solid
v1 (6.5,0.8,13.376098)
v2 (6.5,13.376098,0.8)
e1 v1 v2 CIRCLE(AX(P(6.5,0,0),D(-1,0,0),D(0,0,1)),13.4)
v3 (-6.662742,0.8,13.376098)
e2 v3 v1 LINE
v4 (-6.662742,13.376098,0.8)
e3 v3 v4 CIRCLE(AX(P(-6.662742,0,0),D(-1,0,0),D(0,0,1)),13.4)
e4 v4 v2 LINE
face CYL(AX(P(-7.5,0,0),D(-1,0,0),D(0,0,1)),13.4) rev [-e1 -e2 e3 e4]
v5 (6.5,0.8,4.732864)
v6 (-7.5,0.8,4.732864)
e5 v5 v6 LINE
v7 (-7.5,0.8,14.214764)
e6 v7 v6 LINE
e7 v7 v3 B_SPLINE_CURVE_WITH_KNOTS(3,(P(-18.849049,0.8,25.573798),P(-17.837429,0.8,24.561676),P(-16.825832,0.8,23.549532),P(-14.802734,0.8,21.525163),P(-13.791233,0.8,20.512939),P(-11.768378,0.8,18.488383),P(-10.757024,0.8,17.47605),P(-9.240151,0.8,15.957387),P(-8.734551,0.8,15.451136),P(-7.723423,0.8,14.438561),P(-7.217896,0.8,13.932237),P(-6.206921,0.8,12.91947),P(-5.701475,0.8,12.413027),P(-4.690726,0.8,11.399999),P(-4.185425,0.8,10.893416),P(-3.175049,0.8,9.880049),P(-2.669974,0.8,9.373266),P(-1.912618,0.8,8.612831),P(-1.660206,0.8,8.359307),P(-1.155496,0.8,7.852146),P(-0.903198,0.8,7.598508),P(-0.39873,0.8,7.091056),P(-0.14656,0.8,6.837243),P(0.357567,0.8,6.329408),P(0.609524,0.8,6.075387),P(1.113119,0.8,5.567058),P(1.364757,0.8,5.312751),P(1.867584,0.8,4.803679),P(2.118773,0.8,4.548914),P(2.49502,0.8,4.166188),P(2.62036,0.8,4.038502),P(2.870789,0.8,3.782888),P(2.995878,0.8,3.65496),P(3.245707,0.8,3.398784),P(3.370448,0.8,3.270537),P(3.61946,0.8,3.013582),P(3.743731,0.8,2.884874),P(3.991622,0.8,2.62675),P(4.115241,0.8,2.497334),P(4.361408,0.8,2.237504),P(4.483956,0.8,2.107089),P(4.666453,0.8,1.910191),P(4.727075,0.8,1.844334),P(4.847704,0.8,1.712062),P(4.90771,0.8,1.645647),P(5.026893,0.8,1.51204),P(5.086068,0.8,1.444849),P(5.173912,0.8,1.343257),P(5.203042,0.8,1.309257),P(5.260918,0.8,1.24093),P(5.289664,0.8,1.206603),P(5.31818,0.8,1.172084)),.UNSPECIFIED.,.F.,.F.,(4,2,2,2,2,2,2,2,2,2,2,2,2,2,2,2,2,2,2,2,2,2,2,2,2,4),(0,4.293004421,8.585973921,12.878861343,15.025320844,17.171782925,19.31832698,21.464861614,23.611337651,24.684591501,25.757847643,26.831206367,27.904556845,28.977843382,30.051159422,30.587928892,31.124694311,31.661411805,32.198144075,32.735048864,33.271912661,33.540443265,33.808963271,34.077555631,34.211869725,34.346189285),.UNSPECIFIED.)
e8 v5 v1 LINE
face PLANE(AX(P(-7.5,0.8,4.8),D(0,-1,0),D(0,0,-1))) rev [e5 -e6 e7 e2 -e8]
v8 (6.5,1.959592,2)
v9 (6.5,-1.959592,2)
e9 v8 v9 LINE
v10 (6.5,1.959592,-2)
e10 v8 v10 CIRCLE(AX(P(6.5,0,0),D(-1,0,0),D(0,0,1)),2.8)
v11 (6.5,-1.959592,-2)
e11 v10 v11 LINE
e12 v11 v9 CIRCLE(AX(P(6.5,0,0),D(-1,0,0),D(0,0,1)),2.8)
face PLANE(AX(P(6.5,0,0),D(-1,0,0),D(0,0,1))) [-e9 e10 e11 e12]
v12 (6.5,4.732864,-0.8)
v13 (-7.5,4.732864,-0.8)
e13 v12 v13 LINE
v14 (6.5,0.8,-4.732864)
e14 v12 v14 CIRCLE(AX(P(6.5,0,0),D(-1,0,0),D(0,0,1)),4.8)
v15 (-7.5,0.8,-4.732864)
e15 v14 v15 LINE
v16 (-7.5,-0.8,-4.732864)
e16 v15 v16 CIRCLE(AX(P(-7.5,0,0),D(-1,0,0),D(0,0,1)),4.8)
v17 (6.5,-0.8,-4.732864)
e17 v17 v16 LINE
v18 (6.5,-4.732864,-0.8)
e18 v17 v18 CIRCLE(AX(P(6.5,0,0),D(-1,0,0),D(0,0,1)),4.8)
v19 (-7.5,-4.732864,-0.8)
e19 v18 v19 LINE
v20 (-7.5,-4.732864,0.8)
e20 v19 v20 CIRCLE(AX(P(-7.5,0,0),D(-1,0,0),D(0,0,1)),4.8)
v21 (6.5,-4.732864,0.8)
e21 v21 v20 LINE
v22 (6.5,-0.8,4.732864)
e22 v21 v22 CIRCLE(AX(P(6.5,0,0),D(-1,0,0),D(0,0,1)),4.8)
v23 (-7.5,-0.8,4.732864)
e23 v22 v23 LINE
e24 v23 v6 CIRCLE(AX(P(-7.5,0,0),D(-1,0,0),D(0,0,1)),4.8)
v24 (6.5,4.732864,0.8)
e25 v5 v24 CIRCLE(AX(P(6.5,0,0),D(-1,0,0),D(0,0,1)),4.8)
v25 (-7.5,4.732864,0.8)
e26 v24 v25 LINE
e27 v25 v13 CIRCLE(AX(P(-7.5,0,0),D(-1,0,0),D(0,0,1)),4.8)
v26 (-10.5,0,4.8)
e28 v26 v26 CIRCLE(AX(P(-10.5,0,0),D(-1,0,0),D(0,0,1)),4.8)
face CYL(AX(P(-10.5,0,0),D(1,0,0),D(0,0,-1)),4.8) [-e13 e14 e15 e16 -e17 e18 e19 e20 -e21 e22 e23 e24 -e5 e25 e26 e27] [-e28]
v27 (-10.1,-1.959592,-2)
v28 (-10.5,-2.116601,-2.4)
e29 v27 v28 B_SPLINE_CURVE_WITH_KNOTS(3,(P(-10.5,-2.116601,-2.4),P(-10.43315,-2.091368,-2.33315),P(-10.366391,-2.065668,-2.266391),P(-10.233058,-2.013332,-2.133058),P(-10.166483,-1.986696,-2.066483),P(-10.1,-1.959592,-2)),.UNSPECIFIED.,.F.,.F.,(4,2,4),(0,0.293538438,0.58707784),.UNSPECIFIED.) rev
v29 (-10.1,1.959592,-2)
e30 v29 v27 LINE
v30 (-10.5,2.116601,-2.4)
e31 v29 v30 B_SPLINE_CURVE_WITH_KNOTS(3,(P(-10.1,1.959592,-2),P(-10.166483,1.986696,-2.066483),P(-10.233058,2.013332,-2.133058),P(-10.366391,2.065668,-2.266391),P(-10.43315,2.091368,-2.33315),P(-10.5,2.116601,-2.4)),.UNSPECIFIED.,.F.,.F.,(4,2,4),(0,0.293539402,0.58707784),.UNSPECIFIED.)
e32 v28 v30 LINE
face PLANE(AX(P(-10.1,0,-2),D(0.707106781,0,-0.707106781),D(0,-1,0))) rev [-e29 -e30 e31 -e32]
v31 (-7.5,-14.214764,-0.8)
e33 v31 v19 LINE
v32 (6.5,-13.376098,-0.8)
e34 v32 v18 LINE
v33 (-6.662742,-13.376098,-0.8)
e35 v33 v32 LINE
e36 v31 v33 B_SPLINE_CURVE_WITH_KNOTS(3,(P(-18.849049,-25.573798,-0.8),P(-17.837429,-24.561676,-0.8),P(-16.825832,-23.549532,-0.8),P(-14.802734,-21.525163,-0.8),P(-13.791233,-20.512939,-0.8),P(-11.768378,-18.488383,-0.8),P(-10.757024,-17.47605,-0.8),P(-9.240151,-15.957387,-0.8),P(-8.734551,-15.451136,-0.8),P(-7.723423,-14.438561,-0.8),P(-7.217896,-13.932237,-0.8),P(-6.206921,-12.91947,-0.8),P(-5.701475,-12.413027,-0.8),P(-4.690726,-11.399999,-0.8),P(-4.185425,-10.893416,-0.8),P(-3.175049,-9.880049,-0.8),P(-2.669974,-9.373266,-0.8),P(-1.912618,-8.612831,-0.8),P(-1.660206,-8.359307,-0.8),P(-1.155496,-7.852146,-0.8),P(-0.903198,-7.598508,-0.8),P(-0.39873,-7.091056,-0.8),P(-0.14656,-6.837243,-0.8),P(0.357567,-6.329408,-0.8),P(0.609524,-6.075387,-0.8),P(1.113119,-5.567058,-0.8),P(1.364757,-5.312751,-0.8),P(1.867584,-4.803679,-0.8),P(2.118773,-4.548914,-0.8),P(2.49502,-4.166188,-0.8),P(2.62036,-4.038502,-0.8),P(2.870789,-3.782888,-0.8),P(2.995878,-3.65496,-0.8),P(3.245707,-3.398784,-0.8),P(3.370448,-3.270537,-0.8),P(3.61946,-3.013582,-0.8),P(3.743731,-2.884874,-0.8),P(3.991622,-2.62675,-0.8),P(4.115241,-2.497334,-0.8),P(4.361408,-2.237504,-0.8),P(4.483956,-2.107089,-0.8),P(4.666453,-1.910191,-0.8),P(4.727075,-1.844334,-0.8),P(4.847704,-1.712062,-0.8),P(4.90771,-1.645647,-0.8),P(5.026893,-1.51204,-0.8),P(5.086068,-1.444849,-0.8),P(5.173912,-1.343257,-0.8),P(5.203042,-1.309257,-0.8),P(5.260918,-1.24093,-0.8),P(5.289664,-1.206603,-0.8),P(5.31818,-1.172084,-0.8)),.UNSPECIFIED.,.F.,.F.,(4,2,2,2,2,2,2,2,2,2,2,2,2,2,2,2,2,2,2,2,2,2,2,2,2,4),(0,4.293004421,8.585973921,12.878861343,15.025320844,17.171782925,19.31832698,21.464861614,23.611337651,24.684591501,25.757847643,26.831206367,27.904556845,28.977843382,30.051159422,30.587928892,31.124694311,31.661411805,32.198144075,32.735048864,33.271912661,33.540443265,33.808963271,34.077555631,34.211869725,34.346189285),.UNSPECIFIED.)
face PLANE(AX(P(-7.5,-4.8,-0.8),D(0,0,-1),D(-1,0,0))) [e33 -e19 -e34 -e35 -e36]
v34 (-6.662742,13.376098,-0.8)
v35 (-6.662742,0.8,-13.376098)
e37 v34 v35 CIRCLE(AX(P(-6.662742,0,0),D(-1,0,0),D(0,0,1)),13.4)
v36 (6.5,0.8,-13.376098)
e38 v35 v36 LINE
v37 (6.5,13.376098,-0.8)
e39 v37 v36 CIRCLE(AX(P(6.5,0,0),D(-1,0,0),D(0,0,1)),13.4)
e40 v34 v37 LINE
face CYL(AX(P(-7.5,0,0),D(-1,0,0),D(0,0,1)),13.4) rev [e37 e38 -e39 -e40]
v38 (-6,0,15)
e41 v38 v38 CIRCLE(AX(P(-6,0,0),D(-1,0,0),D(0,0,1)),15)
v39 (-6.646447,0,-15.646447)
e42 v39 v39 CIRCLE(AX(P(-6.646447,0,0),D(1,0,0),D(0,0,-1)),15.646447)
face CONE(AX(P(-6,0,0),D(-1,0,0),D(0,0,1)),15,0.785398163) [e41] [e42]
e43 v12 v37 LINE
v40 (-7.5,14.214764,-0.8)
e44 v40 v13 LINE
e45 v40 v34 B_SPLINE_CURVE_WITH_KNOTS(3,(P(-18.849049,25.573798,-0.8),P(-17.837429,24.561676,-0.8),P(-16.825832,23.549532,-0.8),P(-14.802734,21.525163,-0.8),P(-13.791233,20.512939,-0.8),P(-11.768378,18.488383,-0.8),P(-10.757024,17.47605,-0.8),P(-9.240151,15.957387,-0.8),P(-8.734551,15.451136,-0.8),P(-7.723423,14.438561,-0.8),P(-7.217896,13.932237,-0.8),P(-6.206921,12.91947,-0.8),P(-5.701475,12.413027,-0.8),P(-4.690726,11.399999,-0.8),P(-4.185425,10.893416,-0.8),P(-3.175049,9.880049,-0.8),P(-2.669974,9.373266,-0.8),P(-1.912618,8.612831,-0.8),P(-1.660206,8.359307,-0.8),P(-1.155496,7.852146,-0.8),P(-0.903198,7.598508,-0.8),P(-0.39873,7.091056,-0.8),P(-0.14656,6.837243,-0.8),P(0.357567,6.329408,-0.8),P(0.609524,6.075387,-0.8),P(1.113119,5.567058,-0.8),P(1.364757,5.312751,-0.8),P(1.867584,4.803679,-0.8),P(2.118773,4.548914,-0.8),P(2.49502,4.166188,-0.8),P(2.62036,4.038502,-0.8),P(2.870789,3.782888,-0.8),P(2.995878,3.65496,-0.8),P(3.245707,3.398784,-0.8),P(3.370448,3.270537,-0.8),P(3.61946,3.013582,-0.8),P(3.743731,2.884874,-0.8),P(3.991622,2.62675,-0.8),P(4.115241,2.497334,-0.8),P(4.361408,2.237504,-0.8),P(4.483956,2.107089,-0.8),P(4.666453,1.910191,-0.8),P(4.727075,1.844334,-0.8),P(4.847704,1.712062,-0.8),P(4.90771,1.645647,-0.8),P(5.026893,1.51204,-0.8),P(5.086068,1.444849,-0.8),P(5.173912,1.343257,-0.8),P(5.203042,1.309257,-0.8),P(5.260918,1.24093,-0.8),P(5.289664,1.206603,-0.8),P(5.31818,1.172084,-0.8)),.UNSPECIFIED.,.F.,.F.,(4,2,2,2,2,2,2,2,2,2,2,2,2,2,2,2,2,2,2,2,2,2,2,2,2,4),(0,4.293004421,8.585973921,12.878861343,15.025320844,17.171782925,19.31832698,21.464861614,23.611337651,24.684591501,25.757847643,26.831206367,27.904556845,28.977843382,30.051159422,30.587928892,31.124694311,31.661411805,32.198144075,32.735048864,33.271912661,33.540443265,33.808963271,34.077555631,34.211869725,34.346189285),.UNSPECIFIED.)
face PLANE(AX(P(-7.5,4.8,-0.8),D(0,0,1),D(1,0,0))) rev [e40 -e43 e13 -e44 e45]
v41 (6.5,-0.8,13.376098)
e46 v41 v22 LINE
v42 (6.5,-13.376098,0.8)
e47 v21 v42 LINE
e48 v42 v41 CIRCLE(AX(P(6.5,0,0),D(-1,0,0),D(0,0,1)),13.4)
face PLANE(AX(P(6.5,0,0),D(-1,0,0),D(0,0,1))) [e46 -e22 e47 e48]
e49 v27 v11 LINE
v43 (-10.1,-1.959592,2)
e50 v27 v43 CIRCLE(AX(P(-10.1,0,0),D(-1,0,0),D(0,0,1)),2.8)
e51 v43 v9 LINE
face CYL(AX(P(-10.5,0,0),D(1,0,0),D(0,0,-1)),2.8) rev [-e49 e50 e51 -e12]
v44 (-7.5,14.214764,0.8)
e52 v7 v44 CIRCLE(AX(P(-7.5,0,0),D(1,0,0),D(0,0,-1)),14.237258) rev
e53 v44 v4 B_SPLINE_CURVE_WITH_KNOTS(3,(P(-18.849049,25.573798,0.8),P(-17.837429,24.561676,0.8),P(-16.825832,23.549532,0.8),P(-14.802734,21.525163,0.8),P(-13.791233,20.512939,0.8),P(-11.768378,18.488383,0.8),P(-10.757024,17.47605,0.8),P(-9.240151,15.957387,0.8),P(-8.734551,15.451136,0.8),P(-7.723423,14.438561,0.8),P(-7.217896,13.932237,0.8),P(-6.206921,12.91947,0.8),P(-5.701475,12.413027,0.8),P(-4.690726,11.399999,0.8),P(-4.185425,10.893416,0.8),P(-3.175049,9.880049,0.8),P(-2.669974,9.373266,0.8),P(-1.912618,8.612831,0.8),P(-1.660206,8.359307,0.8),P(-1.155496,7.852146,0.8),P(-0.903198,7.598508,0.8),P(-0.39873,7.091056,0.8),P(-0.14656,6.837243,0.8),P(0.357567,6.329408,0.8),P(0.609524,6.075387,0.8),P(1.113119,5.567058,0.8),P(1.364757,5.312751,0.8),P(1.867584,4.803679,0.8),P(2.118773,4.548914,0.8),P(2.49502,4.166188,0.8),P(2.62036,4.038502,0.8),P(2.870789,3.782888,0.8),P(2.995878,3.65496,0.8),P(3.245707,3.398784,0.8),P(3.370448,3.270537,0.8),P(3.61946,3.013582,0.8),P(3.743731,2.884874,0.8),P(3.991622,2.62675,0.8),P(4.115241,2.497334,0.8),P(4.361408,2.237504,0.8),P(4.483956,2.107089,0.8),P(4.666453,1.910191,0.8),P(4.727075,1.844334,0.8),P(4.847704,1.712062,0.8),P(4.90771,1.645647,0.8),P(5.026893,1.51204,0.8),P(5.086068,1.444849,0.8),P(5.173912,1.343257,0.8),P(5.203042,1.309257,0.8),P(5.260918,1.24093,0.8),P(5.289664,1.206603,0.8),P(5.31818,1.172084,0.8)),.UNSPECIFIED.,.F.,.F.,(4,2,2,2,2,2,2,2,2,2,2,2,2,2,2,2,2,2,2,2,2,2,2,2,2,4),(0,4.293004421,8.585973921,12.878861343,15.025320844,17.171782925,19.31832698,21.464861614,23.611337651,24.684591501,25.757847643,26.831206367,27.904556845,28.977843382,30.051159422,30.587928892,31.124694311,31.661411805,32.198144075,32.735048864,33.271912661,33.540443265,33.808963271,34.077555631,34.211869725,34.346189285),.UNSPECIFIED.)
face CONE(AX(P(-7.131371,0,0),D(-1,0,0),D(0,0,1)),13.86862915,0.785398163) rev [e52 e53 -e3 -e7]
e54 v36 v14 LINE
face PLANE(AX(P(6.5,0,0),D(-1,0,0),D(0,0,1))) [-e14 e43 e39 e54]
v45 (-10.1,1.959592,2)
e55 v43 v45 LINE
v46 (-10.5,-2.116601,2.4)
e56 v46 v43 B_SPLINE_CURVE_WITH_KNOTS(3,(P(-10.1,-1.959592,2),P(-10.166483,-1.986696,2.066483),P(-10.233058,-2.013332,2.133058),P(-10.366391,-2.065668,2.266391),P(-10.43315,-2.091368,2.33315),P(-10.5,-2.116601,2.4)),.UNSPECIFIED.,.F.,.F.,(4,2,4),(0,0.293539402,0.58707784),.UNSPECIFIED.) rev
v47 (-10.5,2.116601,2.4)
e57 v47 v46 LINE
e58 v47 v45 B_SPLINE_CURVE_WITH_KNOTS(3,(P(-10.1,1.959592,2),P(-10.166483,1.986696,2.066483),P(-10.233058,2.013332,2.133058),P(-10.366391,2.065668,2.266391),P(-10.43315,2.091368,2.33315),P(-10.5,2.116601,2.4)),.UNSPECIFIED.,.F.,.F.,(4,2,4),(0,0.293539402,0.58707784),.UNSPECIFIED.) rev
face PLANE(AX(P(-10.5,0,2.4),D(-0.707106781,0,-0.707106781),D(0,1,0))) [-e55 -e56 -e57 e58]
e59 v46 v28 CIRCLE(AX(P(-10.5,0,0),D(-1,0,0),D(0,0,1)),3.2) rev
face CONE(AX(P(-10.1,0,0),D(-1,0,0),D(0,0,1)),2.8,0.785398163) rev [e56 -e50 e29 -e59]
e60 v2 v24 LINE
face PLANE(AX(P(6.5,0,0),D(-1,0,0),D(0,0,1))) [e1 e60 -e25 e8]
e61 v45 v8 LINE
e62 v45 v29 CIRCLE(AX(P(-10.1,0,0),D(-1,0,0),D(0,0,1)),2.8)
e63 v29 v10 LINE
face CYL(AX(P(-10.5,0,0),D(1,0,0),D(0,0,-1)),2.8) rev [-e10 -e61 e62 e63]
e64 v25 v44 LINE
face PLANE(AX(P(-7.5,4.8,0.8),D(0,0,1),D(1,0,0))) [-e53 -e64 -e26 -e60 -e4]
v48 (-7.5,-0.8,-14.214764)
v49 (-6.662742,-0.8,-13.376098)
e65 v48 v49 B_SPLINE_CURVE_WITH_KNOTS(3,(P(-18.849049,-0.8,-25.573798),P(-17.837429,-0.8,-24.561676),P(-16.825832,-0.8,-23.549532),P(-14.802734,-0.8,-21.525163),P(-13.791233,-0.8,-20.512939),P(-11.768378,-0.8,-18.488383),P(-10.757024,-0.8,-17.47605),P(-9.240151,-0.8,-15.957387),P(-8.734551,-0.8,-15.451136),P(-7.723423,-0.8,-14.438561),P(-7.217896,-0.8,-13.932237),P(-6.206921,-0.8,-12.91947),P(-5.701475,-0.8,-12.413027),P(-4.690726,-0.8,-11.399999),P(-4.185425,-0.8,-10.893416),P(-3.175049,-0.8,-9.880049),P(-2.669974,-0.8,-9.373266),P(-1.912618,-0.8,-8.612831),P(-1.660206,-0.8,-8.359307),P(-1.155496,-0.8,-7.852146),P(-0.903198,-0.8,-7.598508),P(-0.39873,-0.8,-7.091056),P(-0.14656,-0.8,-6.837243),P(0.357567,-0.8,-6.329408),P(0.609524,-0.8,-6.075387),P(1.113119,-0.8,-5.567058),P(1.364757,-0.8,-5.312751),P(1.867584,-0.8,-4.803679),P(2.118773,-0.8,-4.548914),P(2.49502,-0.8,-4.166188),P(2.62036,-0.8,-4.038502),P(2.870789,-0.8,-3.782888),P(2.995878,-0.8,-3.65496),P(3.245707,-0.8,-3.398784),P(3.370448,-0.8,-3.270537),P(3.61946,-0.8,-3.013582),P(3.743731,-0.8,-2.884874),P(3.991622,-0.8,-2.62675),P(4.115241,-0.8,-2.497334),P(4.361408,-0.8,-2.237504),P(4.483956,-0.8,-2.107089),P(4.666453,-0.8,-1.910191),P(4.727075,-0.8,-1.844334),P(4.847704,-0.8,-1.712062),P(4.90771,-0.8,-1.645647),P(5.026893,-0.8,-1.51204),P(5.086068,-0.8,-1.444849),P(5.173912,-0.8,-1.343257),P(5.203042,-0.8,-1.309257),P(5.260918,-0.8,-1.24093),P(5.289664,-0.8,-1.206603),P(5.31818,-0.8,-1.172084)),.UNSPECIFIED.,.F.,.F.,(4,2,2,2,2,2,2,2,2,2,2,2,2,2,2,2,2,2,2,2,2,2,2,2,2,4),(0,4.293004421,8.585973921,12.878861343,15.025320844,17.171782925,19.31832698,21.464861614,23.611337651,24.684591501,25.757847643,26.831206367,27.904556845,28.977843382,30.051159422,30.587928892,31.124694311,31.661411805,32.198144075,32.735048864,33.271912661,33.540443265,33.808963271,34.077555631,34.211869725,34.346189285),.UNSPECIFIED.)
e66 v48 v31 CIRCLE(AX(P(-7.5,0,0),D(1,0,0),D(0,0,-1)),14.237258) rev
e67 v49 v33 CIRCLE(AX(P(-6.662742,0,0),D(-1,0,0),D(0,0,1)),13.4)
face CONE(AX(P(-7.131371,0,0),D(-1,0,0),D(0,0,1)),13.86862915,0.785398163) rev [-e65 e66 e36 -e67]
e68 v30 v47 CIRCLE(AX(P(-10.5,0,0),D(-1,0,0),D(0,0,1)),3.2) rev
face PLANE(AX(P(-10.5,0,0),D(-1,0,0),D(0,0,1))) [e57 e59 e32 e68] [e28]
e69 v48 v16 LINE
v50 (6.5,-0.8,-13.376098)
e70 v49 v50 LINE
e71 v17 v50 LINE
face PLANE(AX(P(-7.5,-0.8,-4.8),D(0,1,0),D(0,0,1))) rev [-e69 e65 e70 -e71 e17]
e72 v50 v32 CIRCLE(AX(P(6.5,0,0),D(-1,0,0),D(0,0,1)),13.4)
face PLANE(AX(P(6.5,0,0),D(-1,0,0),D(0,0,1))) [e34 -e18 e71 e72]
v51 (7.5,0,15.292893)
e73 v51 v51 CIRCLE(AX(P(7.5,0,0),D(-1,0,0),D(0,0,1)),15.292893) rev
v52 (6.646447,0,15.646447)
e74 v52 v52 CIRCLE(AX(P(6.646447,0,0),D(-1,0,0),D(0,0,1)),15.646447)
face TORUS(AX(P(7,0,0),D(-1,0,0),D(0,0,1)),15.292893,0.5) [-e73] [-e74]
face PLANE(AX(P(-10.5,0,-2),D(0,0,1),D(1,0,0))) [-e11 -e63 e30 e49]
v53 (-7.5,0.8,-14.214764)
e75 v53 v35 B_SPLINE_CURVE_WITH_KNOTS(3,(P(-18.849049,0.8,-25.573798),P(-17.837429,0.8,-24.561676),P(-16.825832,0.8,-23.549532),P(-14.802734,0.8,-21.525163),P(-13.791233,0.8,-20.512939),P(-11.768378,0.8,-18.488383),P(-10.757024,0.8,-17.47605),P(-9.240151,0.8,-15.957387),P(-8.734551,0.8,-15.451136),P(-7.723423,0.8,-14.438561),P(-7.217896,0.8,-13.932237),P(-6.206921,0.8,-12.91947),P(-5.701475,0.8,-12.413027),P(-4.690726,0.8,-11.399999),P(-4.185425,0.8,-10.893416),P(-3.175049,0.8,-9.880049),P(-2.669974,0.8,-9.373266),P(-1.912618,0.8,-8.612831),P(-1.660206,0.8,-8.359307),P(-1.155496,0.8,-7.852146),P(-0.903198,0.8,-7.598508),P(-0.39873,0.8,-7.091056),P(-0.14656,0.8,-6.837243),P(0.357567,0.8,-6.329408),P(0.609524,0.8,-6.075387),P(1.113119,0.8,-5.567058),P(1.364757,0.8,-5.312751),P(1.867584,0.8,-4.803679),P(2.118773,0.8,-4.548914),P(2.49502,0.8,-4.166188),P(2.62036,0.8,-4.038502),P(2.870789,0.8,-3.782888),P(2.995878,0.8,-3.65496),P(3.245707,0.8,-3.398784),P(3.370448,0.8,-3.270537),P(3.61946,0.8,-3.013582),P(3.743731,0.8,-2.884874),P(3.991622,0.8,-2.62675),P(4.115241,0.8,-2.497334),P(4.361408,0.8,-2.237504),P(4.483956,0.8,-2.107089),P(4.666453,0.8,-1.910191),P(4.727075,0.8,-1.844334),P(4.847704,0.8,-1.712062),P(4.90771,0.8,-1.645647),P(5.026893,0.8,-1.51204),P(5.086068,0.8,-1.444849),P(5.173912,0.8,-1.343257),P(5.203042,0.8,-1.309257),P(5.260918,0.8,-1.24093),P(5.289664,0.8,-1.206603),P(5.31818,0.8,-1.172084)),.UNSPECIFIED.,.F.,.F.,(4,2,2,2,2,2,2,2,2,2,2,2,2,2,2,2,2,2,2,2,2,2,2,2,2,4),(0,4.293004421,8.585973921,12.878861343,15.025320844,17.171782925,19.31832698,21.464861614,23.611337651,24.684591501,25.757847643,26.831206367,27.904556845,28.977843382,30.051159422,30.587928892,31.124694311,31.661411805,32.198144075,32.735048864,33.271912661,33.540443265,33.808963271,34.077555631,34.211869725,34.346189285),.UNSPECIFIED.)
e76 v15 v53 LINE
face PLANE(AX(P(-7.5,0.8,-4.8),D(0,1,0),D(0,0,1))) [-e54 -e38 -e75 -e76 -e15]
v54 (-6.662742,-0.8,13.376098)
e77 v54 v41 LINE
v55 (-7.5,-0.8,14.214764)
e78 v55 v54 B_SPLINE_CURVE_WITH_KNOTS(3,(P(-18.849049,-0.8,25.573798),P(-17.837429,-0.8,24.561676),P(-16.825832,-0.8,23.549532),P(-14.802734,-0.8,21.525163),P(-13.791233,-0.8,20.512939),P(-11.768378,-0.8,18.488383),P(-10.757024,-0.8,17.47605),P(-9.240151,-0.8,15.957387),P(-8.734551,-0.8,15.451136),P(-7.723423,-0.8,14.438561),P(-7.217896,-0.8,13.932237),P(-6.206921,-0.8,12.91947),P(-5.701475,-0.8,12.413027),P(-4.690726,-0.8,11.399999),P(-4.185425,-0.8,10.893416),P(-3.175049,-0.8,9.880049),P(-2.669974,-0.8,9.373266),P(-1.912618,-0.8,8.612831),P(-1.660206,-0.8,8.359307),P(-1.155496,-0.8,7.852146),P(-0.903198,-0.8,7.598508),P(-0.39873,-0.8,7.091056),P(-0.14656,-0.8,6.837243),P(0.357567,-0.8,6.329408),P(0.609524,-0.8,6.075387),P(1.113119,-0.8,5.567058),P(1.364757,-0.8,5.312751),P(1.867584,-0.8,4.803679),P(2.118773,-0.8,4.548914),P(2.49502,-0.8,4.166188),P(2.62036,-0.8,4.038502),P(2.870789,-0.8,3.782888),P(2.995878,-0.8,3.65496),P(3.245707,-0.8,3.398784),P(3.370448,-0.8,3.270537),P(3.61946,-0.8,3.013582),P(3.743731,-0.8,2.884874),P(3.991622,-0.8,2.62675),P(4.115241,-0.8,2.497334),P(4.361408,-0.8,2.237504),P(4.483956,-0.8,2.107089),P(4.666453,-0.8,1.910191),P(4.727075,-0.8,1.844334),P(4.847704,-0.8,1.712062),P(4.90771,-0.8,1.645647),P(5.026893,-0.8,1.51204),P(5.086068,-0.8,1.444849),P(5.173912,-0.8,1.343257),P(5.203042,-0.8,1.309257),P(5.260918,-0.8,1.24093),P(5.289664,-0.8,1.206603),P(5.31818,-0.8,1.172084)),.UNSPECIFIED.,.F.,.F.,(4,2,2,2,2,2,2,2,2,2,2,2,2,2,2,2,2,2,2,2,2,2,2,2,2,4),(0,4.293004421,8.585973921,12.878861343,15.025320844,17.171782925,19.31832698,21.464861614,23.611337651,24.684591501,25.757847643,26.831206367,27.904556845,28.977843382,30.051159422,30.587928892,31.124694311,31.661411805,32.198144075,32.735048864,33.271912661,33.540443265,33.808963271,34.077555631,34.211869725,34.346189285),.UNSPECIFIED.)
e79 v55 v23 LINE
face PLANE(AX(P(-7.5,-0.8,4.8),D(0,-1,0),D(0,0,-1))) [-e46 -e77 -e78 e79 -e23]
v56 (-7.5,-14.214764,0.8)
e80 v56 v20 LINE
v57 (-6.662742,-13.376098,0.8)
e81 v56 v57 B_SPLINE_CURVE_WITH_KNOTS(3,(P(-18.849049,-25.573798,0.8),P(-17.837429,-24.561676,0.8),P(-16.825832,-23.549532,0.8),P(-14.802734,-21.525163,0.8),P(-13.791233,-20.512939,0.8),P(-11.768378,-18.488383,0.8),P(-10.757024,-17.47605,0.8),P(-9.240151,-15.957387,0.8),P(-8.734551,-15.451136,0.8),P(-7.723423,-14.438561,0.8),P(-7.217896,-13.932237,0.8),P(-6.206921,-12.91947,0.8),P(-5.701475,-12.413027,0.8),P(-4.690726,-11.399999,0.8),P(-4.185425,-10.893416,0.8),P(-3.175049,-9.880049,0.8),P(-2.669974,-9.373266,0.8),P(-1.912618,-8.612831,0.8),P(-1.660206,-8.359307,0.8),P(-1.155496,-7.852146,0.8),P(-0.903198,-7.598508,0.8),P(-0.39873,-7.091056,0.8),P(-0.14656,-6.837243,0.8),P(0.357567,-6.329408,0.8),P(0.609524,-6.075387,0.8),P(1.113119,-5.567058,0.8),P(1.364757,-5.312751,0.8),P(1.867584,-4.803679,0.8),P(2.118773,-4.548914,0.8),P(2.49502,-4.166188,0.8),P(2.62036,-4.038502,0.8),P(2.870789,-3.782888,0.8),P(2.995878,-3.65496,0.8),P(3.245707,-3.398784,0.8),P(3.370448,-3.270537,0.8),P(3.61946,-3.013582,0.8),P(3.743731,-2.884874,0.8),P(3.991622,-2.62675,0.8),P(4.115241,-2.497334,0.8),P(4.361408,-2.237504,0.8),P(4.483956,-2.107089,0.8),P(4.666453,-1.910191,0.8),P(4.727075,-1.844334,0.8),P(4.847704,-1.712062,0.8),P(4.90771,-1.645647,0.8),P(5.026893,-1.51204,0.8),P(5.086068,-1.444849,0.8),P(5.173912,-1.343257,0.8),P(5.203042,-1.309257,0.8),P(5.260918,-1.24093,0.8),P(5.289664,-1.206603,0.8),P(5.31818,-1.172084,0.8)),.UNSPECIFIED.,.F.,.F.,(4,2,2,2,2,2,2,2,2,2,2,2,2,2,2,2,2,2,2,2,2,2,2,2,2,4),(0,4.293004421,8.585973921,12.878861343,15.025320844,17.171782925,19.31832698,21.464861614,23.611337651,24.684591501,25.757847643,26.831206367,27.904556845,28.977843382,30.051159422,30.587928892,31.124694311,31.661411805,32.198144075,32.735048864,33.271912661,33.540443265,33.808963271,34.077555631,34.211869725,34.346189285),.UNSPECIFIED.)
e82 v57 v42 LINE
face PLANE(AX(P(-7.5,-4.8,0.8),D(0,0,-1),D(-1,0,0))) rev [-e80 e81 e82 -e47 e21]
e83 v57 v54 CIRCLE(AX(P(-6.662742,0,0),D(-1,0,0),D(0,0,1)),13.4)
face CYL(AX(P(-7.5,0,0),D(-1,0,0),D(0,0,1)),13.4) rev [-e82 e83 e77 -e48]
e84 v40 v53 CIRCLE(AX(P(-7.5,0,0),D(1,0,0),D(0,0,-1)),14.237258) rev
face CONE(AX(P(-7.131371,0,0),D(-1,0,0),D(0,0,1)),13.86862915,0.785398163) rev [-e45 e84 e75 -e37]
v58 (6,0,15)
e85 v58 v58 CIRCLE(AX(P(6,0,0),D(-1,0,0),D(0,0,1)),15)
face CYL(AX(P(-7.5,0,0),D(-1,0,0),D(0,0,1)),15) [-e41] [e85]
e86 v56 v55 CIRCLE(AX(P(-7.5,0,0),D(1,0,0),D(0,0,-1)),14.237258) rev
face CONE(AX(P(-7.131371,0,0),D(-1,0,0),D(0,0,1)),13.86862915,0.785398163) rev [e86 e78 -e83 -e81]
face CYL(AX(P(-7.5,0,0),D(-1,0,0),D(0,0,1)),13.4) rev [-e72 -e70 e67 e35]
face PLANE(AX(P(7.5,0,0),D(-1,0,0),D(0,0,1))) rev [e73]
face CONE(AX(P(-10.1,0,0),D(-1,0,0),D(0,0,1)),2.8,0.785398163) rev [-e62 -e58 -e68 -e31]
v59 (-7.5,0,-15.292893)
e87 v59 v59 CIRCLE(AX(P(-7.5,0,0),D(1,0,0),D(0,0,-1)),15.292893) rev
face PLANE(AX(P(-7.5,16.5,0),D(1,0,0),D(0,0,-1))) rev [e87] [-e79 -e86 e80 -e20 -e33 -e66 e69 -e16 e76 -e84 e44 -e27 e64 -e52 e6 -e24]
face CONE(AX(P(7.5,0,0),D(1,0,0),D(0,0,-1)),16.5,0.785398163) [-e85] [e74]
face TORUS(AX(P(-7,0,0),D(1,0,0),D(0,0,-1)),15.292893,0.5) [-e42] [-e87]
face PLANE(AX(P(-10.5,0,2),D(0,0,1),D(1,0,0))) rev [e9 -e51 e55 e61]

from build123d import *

# Parameters (mm, degrees)
REDONDEO2_R             = 0.5
MOVER_CARA1_BY          = 0.6
CROQUIS3_R              = 4.8
CROQUIS3_R_2            = 2.8
SALIENTE_EXTRUIR1_DEPTH = 17
NERVIO4_REACH           = 28.904
CROQUIS5_WALLS_W        = 1.6
CROQUIS5_WALLS_H        = 65.245471754
MATRIZC1_COUNT          = 4
CHAFL_N1_SIZE           = 0.4


# Read off the part's stored shape, not the designer's step: Vaciado1
with BuildPart() as part:
    # Croquis2 → Revolución1 (revolve)
    with BuildSketch(Plane.XY, mode=Mode.PRIVATE) as revoluci_n1_sk:
        Polygon((-7.5, 0), (7.5, 0), (7.5, 16.5), (6, 15), (-6, 15), (-7.5, 16.5), align=None)
    revolve(revoluci_n1_sk.sketch.rotate(Axis((-7.5, 0, 0), (1, 0, 0)), 90), axis=Axis((-7.5, 0, 0), (1, 0, 0)))

    # Vaciado1 outline → Vaciado1 (revolve, cut)
    with BuildSketch(Plane.YX):
        Polygon((13.4, 5.9), (0, 5.9), (0, -7.5), (14.2372583, -7.5), (13.4, -6.6627417), align=None)
    revolve(axis=Axis((0, 0, 0), (1, 0, 0)), mode=Mode.SUBTRACT)

    # Redondeo2
    redondeo2_edges = [part.edges().sort_by_distance(p)[0] for p in [
        (-7.5, 0, -16.5),
        (7.5, 0, -16.5),
    ]]
    fillet(redondeo2_edges, radius=REDONDEO2_R)

    # Mover cara1: a face moved inward by 0.6
    extrude(part.faces().sort_by_distance((5.9, 0, 0))[0], amount=MOVER_CARA1_BY, dir=(1, 0, 0), mode=Mode.SUBTRACT)

    # Croquis3 → Saliente-Extruir1 (add)
    # profile 1 of 3: a face of its own
    with BuildSketch(Plane.ZY.offset(-6.5)):
        Circle(CROQUIS3_R)
        Circle(CROQUIS3_R_2, mode=Mode.SUBTRACT)
    # profile 2 of 3: a face of its own
    with BuildSketch(Plane.ZY.offset(-6.5)):
        with BuildLine():
            ThreePointArc((2.8, 0), (2.592296279, 1.058300524), (2, 1.959591794))
            Line((2, 1.959591794), (2, -1.959591794))
            ThreePointArc((2, -1.959591794), (2.592296279, -1.058300524), (2.8, 0))
        make_face()
    # profile 3 of 3: a face of its own
    with BuildSketch(Plane.ZY.offset(-6.5)):
        with BuildLine():
            Line((-2, -1.959591794), (-2, 1.959591794))
            ThreePointArc((-2, 1.959591794), (-2.8, 0), (-2, -1.959591794))
        make_face()
    extrude(amount=SALIENTE_EXTRUIR1_DEPTH)

    # Croquis5 walls → Nervio4 (add, up to next)
    with BuildSketch(Plane.ZY.offset(7.5), mode=Mode.PRIVATE) as nervio4_sk1:
        with Locations((0, 9.51862915)):
            Rectangle(CROQUIS5_WALLS_W, CROQUIS5_WALLS_H)
    nervio4_tool1 = extrude(nervio4_sk1.sketch, amount=-NERVIO4_REACH, mode=Mode.PRIVATE) - part.part
    nervio4 = nervio4_tool1.solids().sort_by_distance((-7.5, 9.51862915, 0))[0]
    add(nervio4)

    # MatrizC1: Nervio4 ×4 about axis
    matrizc1_axis = Axis((0, 0, 0), (1, 0, 0))
    for i in range(1, MATRIZC1_COUNT):
        add(nervio4.rotate(matrizc1_axis, i * 360 / MATRIZC1_COUNT))

    # Chaflán1
    chafl_n1_edges = [part.edges().sort_by_distance(p)[0] for p in [
        (-10.5, 0, -2),
        (-10.5, 2.8, 0),
        (-10.5, -2.8, 0),
        (-10.5, 0, 2),
    ]]
    chamfer(chafl_n1_edges, length=CHAFL_N1_SIZE)


solid = part.part
